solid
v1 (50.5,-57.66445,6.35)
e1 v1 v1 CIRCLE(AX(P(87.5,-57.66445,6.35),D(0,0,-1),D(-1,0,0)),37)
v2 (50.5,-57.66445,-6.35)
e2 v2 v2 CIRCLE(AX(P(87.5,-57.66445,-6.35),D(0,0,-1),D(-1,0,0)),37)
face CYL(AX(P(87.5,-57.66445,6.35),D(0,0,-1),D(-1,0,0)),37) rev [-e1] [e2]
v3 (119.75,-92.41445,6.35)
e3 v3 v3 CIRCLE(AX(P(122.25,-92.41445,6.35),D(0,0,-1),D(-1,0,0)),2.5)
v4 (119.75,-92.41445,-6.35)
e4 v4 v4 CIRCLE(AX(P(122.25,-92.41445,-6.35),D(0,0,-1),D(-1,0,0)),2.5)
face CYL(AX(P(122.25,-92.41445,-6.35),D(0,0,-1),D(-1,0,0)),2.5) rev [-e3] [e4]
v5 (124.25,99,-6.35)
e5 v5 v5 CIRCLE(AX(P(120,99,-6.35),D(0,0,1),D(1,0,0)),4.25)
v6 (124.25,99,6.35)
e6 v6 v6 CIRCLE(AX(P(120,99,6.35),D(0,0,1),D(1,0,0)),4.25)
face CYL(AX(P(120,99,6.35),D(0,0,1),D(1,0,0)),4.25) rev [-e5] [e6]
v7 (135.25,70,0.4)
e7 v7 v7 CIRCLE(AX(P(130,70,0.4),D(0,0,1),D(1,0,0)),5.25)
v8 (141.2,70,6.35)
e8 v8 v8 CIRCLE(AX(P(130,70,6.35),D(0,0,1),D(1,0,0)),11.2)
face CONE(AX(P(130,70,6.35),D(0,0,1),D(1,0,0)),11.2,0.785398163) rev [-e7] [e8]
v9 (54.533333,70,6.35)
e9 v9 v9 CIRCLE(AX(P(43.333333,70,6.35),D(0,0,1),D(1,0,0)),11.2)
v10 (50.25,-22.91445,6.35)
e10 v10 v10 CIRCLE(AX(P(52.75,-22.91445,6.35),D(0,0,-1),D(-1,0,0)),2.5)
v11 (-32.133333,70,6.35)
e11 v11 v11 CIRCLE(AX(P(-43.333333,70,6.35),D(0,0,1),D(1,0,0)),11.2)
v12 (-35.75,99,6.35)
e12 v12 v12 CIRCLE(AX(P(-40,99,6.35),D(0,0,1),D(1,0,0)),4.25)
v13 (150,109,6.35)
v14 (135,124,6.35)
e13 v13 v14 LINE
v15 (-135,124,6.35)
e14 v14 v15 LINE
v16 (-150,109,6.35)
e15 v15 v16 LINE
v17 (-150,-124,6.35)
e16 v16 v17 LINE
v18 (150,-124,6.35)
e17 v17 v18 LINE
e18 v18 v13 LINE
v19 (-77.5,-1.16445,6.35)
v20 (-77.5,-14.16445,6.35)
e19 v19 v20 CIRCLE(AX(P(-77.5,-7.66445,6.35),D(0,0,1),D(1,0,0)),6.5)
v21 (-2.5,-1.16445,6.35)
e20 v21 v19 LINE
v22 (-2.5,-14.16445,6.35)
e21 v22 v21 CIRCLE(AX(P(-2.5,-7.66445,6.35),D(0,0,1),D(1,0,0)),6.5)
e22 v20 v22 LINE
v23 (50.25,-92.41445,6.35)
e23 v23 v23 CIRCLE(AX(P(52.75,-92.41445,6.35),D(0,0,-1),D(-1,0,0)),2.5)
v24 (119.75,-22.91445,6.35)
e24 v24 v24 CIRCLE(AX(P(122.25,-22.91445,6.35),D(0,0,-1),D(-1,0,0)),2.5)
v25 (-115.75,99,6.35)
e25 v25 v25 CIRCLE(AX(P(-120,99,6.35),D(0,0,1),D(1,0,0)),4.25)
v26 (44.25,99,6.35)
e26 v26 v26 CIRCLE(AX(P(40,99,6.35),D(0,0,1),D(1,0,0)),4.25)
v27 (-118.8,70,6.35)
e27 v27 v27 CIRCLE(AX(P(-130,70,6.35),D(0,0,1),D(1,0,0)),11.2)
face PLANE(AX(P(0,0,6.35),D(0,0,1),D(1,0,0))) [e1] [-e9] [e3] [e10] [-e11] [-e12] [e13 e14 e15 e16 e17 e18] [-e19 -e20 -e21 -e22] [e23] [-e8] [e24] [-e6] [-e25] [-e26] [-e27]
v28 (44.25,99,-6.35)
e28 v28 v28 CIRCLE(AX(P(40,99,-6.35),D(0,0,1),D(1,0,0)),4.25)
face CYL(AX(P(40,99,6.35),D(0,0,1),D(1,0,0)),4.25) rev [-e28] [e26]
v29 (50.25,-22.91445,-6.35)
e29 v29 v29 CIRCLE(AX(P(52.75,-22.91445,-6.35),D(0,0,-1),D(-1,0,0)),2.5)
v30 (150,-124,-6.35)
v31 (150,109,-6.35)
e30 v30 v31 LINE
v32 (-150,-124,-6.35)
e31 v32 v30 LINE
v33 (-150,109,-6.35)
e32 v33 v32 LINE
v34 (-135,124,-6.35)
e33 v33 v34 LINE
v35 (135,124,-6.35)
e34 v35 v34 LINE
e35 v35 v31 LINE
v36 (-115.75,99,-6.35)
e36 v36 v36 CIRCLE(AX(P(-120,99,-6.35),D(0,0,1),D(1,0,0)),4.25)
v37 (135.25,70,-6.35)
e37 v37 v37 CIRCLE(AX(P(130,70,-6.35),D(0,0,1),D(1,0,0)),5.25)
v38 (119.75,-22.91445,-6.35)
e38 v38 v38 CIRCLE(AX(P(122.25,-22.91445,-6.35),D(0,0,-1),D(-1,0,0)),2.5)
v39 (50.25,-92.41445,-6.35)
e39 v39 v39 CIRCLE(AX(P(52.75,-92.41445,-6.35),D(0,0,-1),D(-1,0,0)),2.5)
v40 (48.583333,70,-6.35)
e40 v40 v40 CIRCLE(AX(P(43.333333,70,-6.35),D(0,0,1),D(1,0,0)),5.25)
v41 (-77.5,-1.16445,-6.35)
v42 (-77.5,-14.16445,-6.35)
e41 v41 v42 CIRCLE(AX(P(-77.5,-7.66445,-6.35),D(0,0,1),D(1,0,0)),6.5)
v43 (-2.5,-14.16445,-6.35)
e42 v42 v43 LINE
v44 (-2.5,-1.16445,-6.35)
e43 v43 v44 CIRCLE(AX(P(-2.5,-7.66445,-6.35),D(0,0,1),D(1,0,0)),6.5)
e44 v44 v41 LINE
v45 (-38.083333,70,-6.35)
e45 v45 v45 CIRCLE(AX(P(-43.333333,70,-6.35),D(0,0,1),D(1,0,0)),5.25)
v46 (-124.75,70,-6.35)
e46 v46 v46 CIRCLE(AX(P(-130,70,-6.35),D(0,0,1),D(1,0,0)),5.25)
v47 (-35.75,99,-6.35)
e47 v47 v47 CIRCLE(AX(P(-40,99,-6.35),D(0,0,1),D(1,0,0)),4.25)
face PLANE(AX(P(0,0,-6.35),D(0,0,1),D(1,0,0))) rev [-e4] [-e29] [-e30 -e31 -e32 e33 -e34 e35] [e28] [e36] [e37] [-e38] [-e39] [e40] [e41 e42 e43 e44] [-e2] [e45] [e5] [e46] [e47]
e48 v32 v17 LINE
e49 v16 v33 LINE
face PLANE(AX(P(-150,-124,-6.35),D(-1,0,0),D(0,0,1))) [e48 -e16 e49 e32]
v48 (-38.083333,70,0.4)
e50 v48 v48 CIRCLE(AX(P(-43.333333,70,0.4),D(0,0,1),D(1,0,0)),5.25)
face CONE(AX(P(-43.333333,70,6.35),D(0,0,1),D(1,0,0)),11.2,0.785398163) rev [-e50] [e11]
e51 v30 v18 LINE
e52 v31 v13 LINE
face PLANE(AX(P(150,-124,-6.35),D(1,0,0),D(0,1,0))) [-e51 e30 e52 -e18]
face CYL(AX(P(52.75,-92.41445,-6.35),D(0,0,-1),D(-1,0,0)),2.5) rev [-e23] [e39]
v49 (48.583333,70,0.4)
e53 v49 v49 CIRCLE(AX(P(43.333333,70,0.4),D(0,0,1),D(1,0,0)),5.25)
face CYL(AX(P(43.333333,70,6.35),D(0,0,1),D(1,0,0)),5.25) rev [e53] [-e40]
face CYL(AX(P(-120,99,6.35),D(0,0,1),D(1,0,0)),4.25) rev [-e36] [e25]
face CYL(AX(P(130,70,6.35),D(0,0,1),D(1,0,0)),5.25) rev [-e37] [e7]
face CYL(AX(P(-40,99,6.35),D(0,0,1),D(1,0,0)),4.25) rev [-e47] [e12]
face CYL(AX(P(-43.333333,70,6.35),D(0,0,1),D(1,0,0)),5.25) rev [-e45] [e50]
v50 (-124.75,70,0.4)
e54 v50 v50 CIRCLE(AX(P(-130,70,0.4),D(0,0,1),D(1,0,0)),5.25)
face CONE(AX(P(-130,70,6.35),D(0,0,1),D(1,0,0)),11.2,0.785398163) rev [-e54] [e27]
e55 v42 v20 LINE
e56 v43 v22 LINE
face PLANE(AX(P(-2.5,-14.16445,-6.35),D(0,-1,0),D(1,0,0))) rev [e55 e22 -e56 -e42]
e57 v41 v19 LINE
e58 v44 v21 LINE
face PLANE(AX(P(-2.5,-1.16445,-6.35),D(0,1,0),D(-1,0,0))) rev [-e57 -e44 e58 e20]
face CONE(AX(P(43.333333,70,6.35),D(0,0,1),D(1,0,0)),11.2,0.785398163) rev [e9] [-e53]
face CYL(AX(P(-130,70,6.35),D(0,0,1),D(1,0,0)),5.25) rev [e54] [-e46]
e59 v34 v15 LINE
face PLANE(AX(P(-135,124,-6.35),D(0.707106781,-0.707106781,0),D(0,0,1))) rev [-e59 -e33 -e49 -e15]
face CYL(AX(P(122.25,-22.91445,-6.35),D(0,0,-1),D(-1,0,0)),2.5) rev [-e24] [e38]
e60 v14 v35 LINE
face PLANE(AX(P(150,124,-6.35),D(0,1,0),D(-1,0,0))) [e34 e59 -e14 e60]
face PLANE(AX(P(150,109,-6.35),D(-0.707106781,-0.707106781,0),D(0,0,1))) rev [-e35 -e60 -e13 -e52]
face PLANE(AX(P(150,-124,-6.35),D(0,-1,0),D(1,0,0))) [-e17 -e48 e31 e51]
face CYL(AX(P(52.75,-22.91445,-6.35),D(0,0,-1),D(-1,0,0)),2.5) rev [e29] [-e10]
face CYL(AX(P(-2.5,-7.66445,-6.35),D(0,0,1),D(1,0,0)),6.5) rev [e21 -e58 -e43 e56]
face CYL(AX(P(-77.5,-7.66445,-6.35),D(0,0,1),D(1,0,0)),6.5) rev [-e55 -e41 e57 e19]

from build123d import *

# Parameters (mm, degrees)
FLANGE_BASE1_START                    = -6.35
FLANGE_BASE1_OUTLINE_W                = 300
FLANGE_BASE1_OUTLINE_H                = 248
FLANGE_BASE1_DEPTH                    = 12.7
QUEBRA_CANTO1_START                   = -6.35
QUEBRA_CANTO1_DEPTH                   = 12.7
FURO_ROSCADO_DE_M10X1_52_D            = 8.5
FURO_ROSCADO_DE_M10X1_52_DEPTH        = 29.946342369
FURO_ROSCADO_DE_M10X1_52_TIP          = 2.553657631
ESBO_O11_R                            = 16.5
CORTE_EXTRUS_O1_DEPTH                 = 196.031510275
ESBO_O12_R                            = 37
CORTE_EXTRUS_O2_DEPTH                 = 196.031510275
FURO_ROSCADO_DE_M6X1_01_D             = 5
CORTE_EXTRUS_O5_DEPTH                 = 12.7
ESCAREADO_PARA_SFHCS_M101_D           = 10.5
ESCAREADO_PARA_SFHCS_M101_DEPTH       = 32.5
ESCAREADO_PARA_SFHCS_M101_CSINK_D     = 22.4
ESCAREADO_PARA_SFHCS_M101_CSINK_ANGLE = 90
ESCAREADO_PARA_SFHCS_M101_TIP         = 3.15451825


# Read off the part's stored shape, not the designer's step: Flange-base1, Quebra-Canto1
with BuildPart() as part:
    # Flange-base1 outline → Flange-base1 (new body)
    with BuildSketch(Plane.XY.offset(FLANGE_BASE1_START)):
        Rectangle(FLANGE_BASE1_OUTLINE_W, FLANGE_BASE1_OUTLINE_H)
    extrude(amount=FLANGE_BASE1_DEPTH)

    # Quebra-Canto1 outline → Quebra-Canto1 (cut)
    with BuildSketch(Plane.XY.offset(QUEBRA_CANTO1_START)):
        Polygon((-150, 124), (-150, 109), (-135, 124), align=None)
        Polygon((150, 124), (135, 124), (150, 109), align=None)
    extrude(amount=QUEBRA_CANTO1_DEPTH, mode=Mode.SUBTRACT)

    # Furo roscado de M10x1.52
    with Locations(Plane.XY.offset(6.35)):
        with Locations((-40, 99), (-120, 99), (40, 99), (120, 99)):
            Hole(FURO_ROSCADO_DE_M10X1_52_D / 2, depth=FURO_ROSCADO_DE_M10X1_52_DEPTH)
            with Locations((0, 0, -(FURO_ROSCADO_DE_M10X1_52_DEPTH + FURO_ROSCADO_DE_M10X1_52_TIP / 2))):  # 118° drill point
                Cone(0, FURO_ROSCADO_DE_M10X1_52_D / 2, FURO_ROSCADO_DE_M10X1_52_TIP, mode=Mode.SUBTRACT)

    # Esboço11 → Corte-extrusão1 (cut, through all)
    with BuildSketch(Plane.XY.offset(6.35)):
        with Locations((87.5, -57.664450339)):
            Circle(ESBO_O11_R)
    extrude(amount=-CORTE_EXTRUS_O1_DEPTH, mode=Mode.SUBTRACT)

    # Esboço12 → Corte-extrusão2 (cut, through all)
    with BuildSketch(Plane(origin=(0, 0, -6.35), x_dir=(-1, 0, 0), z_dir=(0, 0, -1))):
        with Locations((-87.5, -57.664450339)):
            Circle(ESBO_O12_R)
    extrude(amount=-CORTE_EXTRUS_O2_DEPTH, mode=Mode.SUBTRACT)

    # Furo roscado de M6x1.01 (through all)
    with Locations(Plane(origin=(0, 0, -6.35), x_dir=(-1, 0, 0), z_dir=(0, 0, -1))):
        with Locations((-122.25, -22.914450339), (-87.5, -57.664450339), (-52.75, -92.414450339), (-52.75, -22.914450339), (-122.25, -92.414450339)):
            Hole(FURO_ROSCADO_DE_M6X1_01_D / 2)

    # Esboço20 → Corte-extrusão5 (cut)
    with BuildSketch(Plane.XY.offset(6.35)):
        with BuildLine():
            Line((-2.5, -14.164450339), (-77.5, -14.164450339))
            ThreePointArc((-77.5, -14.164450339), (-84, -7.664450339), (-77.5, -1.164450339))
            Line((-77.5, -1.164450339), (-2.5, -1.164450339))
            ThreePointArc((-2.5, -1.164450339), (4, -7.664450339), (-2.5, -14.164450339))
        make_face()
    extrude(amount=-CORTE_EXTRUS_O5_DEPTH, mode=Mode.SUBTRACT)

    # Escareado para SFHCS M101
    with Locations(Plane.XY.offset(6.35)):
        with Locations((-130, 70), (-43.333333333, 70), (43.333333333, 70), (130, 70)):
            CounterSinkHole(ESCAREADO_PARA_SFHCS_M101_D / 2, ESCAREADO_PARA_SFHCS_M101_CSINK_D / 2, depth=ESCAREADO_PARA_SFHCS_M101_DEPTH, counter_sink_angle=ESCAREADO_PARA_SFHCS_M101_CSINK_ANGLE)
            with Locations((0, 0, -(ESCAREADO_PARA_SFHCS_M101_DEPTH + ESCAREADO_PARA_SFHCS_M101_TIP / 2))):  # 118° drill point
                Cone(0, ESCAREADO_PARA_SFHCS_M101_D / 2, ESCAREADO_PARA_SFHCS_M101_TIP, mode=Mode.SUBTRACT)


solid = part.part
